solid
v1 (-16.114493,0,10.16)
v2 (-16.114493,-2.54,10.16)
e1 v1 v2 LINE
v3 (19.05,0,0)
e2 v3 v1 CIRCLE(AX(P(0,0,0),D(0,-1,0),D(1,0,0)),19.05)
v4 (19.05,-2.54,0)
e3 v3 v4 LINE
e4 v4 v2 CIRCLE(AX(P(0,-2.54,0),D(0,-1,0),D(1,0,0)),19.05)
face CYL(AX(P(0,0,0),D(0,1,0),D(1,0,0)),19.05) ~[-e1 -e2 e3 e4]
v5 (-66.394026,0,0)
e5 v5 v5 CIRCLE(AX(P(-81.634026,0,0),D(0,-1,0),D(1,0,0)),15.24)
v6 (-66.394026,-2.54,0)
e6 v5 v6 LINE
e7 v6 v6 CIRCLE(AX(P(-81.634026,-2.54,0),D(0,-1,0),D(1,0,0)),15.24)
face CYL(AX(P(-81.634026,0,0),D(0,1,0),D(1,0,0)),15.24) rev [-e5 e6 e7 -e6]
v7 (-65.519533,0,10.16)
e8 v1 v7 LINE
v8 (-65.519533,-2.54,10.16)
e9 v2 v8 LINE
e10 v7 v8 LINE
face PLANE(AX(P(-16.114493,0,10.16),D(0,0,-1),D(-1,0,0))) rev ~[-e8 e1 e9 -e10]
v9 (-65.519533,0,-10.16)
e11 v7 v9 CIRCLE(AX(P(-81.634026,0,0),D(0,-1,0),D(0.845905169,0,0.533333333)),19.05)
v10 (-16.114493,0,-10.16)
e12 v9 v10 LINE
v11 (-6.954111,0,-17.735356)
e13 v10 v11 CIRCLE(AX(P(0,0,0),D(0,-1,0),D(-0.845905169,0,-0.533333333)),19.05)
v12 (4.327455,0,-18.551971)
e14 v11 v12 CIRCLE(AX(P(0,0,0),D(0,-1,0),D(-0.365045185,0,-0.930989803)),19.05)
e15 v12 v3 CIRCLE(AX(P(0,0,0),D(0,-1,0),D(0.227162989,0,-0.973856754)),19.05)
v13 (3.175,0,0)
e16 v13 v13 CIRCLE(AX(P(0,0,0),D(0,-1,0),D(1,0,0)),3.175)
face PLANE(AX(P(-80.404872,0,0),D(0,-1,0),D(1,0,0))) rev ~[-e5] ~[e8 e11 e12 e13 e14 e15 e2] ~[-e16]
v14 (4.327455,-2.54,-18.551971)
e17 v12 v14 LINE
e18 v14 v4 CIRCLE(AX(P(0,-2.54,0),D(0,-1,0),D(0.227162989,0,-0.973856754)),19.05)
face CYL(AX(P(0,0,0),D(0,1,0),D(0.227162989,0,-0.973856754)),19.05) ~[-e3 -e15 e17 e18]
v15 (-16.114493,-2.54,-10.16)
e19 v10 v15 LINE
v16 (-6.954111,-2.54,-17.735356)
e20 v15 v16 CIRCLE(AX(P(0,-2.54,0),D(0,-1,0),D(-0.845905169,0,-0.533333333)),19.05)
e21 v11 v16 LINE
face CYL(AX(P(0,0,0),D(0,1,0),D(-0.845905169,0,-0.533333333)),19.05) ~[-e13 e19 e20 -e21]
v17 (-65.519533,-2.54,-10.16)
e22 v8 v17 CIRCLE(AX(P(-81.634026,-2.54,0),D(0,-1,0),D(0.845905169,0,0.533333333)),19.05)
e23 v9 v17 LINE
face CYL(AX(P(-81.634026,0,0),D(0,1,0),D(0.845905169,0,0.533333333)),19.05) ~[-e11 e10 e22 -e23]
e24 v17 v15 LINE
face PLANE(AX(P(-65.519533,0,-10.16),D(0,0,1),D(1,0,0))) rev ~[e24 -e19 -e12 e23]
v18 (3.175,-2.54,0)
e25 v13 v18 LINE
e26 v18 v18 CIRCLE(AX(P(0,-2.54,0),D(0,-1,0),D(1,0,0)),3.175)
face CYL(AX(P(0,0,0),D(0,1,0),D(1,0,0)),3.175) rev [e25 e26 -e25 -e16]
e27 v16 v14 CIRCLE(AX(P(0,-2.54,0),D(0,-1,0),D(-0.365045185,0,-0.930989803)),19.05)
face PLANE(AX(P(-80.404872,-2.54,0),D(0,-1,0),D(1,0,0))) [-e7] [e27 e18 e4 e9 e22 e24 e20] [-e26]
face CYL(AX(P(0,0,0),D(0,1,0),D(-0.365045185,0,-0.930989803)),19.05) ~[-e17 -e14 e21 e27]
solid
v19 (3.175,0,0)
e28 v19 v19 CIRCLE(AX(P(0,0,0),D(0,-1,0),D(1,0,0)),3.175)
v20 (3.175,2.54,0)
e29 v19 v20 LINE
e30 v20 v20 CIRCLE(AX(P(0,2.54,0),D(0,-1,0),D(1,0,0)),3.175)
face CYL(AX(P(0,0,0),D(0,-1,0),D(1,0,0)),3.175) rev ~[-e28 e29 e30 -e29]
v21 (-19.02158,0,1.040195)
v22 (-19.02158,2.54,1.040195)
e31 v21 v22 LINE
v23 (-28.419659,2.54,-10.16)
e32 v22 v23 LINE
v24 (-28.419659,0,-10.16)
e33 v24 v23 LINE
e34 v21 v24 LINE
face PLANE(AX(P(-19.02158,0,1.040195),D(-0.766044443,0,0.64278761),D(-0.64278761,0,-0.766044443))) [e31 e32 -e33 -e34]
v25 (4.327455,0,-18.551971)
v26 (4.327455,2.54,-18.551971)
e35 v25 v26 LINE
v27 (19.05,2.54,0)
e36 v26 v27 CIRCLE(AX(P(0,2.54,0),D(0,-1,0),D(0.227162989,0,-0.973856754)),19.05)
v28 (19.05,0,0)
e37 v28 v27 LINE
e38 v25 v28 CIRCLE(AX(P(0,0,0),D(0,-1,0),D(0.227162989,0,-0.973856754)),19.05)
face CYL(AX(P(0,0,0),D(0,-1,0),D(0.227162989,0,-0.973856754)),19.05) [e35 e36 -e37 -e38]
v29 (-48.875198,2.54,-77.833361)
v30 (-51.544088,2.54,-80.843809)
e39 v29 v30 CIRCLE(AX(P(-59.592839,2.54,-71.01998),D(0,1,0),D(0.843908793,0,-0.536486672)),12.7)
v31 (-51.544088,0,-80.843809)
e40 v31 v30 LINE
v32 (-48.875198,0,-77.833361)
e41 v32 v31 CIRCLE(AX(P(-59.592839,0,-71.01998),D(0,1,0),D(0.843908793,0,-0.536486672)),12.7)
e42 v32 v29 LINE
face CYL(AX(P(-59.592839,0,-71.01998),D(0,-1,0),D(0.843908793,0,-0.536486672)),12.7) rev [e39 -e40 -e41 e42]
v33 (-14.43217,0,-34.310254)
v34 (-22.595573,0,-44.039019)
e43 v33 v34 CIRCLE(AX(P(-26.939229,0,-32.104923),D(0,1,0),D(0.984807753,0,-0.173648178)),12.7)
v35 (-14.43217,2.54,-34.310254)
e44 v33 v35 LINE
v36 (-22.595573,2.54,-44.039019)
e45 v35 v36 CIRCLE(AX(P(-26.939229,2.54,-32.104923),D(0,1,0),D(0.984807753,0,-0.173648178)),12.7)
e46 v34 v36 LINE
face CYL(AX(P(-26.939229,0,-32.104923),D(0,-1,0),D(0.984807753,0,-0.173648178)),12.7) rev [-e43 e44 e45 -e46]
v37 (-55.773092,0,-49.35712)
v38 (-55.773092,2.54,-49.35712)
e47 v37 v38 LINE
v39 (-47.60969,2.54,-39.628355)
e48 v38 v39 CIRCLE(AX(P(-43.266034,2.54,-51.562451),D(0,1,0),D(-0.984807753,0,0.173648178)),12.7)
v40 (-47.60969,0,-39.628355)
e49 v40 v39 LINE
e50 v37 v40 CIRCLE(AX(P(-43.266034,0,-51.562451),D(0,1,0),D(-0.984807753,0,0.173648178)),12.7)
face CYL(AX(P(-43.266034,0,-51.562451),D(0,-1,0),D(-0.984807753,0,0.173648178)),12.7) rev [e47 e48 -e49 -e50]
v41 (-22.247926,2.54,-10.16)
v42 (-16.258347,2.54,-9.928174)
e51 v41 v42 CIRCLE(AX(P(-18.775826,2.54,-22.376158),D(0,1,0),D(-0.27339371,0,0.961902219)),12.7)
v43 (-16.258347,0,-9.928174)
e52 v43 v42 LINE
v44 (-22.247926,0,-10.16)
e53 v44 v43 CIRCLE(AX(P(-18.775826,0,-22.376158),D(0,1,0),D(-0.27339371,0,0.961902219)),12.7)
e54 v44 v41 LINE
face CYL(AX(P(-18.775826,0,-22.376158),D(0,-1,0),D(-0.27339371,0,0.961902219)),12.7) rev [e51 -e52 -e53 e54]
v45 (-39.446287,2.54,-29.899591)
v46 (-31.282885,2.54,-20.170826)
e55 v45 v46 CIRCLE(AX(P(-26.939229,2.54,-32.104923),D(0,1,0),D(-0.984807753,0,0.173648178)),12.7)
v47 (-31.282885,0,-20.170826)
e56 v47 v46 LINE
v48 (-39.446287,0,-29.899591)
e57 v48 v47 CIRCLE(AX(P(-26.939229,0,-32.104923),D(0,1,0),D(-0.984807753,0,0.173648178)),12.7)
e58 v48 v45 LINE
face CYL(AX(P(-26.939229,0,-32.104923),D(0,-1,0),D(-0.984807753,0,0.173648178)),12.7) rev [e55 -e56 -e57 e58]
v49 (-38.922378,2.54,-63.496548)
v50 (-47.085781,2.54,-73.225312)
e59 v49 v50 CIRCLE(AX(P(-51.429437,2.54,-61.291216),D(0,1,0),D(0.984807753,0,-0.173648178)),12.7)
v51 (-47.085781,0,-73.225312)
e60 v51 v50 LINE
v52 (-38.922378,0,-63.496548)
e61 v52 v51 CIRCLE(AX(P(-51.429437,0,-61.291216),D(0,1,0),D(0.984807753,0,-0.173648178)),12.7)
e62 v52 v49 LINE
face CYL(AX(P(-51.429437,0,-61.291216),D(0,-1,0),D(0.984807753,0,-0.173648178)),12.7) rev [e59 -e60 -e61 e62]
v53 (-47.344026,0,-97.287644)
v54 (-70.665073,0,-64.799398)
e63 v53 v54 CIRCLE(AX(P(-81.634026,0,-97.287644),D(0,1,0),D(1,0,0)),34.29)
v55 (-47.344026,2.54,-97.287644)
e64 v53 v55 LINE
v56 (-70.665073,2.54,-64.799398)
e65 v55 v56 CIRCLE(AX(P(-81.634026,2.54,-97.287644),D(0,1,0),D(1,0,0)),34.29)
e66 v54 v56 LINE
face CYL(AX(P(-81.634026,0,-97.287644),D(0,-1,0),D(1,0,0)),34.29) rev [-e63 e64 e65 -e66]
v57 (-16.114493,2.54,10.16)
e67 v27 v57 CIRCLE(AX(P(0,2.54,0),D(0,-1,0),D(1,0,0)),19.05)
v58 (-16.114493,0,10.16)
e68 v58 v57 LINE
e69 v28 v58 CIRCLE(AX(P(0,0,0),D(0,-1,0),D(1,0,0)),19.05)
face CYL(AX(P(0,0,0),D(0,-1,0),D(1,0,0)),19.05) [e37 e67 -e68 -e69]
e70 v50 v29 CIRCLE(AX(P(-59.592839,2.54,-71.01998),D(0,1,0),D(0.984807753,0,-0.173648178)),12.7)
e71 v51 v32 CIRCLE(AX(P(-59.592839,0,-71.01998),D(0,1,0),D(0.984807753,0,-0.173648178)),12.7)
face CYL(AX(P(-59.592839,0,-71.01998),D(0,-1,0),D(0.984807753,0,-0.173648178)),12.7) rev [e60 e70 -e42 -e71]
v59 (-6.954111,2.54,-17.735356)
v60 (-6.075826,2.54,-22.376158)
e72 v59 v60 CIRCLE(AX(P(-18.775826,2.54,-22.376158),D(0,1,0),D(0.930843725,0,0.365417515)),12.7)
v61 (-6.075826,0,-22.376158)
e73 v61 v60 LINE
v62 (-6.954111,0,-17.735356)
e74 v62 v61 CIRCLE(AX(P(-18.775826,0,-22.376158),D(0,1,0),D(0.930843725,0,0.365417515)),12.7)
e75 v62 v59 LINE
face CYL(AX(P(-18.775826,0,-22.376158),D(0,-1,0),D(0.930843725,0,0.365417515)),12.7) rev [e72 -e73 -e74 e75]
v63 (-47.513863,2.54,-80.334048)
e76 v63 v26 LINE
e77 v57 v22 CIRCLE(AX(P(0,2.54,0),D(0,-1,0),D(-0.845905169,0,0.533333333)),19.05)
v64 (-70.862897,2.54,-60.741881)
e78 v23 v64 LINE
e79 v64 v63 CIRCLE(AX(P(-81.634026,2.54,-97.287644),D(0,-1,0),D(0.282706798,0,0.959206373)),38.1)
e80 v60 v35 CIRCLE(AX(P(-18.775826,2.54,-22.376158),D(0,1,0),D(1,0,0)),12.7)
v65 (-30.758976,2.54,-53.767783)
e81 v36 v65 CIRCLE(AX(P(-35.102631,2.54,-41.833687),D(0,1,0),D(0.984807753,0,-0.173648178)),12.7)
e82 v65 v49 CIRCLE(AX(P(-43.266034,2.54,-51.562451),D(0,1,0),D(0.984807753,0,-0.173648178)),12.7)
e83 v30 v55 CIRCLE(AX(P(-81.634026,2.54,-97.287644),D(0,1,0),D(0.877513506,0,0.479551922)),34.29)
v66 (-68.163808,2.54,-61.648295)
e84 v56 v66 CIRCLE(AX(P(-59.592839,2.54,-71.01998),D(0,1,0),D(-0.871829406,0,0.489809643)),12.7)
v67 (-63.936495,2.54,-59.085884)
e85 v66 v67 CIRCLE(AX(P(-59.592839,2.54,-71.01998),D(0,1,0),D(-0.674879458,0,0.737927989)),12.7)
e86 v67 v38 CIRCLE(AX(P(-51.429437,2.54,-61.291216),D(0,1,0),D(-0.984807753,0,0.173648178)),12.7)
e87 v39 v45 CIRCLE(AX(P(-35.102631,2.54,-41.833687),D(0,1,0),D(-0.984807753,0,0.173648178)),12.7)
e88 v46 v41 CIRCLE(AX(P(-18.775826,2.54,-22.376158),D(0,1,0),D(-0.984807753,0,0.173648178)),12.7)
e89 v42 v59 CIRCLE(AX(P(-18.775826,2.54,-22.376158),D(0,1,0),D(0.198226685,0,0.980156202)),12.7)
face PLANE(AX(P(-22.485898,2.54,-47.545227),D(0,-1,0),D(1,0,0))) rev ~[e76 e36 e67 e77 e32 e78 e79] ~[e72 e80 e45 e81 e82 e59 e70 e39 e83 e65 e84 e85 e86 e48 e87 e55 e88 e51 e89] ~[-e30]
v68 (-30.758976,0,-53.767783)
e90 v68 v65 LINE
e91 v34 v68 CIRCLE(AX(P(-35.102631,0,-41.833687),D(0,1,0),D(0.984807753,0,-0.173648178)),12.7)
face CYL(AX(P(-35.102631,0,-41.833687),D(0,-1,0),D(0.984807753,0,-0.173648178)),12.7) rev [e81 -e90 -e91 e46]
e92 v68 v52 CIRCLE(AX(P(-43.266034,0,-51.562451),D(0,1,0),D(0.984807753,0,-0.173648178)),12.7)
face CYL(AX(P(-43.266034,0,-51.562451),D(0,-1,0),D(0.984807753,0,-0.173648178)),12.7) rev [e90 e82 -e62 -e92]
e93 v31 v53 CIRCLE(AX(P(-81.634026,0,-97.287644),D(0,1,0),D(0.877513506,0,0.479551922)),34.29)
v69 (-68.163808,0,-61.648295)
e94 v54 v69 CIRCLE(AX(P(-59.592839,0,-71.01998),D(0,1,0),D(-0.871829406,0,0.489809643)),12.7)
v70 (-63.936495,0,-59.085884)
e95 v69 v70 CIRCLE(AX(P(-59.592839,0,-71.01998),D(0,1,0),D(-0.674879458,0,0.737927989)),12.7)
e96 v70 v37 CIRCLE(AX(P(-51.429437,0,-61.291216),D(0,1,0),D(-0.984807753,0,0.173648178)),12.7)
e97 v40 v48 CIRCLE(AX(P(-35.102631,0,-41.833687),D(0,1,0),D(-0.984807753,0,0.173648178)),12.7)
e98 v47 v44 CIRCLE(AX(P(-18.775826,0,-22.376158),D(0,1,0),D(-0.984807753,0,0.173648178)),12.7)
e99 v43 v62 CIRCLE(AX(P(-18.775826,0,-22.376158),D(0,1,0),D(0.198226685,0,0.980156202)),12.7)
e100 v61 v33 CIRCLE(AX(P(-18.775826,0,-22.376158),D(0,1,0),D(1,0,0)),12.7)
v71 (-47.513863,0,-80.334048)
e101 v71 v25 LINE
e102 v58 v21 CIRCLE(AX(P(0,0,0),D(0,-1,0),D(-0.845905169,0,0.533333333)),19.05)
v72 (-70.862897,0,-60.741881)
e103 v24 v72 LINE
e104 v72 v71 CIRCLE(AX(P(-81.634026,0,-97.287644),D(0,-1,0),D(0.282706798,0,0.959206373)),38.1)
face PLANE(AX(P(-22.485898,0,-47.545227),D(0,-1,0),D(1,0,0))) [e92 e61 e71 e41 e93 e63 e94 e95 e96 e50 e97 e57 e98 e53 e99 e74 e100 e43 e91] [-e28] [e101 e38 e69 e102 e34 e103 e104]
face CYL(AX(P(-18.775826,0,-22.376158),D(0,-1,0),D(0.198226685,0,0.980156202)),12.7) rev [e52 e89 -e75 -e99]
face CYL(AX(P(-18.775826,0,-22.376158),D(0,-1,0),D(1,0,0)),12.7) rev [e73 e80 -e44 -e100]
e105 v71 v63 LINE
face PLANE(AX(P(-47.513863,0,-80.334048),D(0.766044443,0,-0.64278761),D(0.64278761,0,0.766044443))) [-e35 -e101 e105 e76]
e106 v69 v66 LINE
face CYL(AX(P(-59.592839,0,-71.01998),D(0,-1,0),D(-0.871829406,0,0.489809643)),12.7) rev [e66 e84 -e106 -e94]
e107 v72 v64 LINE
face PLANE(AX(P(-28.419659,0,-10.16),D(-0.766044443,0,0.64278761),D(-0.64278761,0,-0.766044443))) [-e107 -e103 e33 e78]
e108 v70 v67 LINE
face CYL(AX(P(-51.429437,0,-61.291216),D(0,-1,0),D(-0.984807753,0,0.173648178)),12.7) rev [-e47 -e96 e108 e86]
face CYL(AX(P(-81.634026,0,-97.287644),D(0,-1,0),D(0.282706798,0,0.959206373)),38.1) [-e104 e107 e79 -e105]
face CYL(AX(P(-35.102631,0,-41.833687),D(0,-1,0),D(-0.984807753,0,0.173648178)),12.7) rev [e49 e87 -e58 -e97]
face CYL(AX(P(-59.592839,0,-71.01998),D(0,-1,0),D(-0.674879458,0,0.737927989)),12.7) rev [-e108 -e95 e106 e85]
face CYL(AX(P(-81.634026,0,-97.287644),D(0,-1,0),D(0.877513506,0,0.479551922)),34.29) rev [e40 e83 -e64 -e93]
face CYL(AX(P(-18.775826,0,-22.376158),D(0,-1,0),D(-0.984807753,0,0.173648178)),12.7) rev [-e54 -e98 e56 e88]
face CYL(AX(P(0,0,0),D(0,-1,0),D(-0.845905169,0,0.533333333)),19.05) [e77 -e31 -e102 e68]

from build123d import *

# Parameters (mm, degrees)
F0_R     = 15.24
F0_R_2   = 3.175
F1_DEPTH = 2.54
F2_DEPTH = 2.54


with BuildPart() as f1:
    # F0 (on Front) → F1 (new body)
    with BuildSketch(Plane.XZ):
        with BuildLine():
            ThreePointArc((-65.5195329538, -10.16), (-63.3326111745, -5.287787783), (-62.5840264302, 0))
            ThreePointArc((-62.5840264302, 0), (-63.3326111745, 5.287787783), (-65.5195329538, 10.16))
            ThreePointArc((-65.5195329538, 10.16), (-100.6840264302, 0), (-65.5195329538, -10.16))
        make_face()
        with Locations((-81.6340264302, 0)):
            Circle(F0_R, mode=Mode.SUBTRACT)
        with BuildLine():
            ThreePointArc((-65.5195329538, 10.16), (-63.3326111745, 5.287787783), (-62.5840264302, 0))
            ThreePointArc((-62.5840264302, 0), (-63.3326111745, -5.287787783), (-65.5195329538, -10.16))
            Line((-65.5195329538, -10.16), (-28.4196593422, -10.16))
            Line((-28.4196593422, -10.16), (-19.0215796919, 1.0401951868))
            ThreePointArc((-19.0215796919, 1.0401951868), (-18.1501685771, 5.7856616408), (-16.1144934764, 10.16))
            Line((-16.1144934764, 10.16), (-65.5195329538, 10.16))
        make_face()
        with BuildLine():
            ThreePointArc((19.05, 0), (5.287787783, 18.3014152557), (-16.1144934764, 10.16))
            ThreePointArc((-16.1144934764, 10.16), (-18.1501685771, 5.7856616408), (-19.0215796919, 1.0401951868))
            ThreePointArc((-19.0215796919, 1.0401951868), (-18.4728068477, -4.6538056648), (-16.2583471742, -9.9281744125))
            ThreePointArc((-16.2583471742, -9.9281744125), (-10.6124234359, -12.6473937559), (-6.954110776, -17.7353557426))
            ThreePointArc((-6.954110776, -17.7353557426), (-1.3753346542, -19.0002882765), (4.3274549344, -18.5519711565))
            ThreePointArc((4.3274549344, -18.5519711565), (14.9221398683, -11.8419695047), (19.05, 0))
        make_face()
        Circle(F0_R_2, mode=Mode.SUBTRACT)
        with BuildLine():
            ThreePointArc((-16.2583471742, -9.9281744125), (-19.2670095389, -9.6856602103), (-22.2479261978, -10.16))
            Line((-22.2479261978, -10.16), (-16.1144934764, -10.16))
            ThreePointArc((-16.1144934764, -10.16), (-16.1868353523, -10.0443447411), (-16.2583471742, -9.9281744125))
        make_face()
        with BuildLine():
            Line((-19.0215796919, 1.0401951868), (-28.4196593422, -10.16))
            Line((-28.4196593422, -10.16), (-22.2479261978, -10.16))
            ThreePointArc((-22.2479261978, -10.16), (-19.2670095389, -9.6856602103), (-16.2583471742, -9.9281744125))
            ThreePointArc((-16.2583471742, -9.9281744125), (-18.4728068477, -4.6538056648), (-19.0215796919, 1.0401951868))
        make_face()
        with BuildLine():
            ThreePointArc((-6.954110776, -17.7353557426), (-10.6124234359, -12.6473937559), (-16.2583471742, -9.9281744125))
            ThreePointArc((-16.2583471742, -9.9281744125), (-16.1868353523, -10.0443447411), (-16.1144934764, -10.16))
            ThreePointArc((-16.1144934764, -10.16), (-12.1402895021, -14.6804588077), (-6.954110776, -17.7353557426))
        make_face()
    extrude(amount=F1_DEPTH)


with BuildPart() as f2:
    # F0 (on Front) → F2 (new body)
    with BuildSketch(Plane.XZ):
        with BuildLine():
            Line((-47.513862793, -80.334047803), (4.3274549344, -18.5519711565))
            ThreePointArc((4.3274549344, -18.5519711565), (-1.3753346542, -19.0002882765), (-6.954110776, -17.7353557426))
            ThreePointArc((-6.954110776, -17.7353557426), (-6.2973288868, -20.014568078), (-6.0758260789, -22.3761581835))
            ThreePointArc((-6.0758260789, -22.3761581835), (-8.3725951165, -29.6605789252), (-14.4321702587, -34.3102544675))
            ThreePointArc((-14.4321702587, -34.3102544675), (-17.2104642944, -40.2683252541), (-22.5955729017, -44.0390188951))
            ThreePointArc((-22.5955729017, -44.0390188951), (-25.3738669374, -49.9970896817), (-30.7589755447, -53.7677833227))
            ThreePointArc((-30.7589755447, -53.7677833227), (-33.5372695804, -59.7258541094), (-38.9223781878, -63.4965477503))
            ThreePointArc((-38.9223781878, -63.4965477503), (-41.7006722234, -69.454618537), (-47.0857808308, -73.2253121779))
            ThreePointArc((-47.0857808308, -73.2253121779), (-47.7541230349, -75.6172400855), (-48.8751976268, -77.8333610605))
            ThreePointArc((-48.8751976268, -77.8333610605), (-48.1711624462, -79.0709833859), (-47.513862793, -80.334047803))
        make_face()
        with BuildLine():
            ThreePointArc((-68.1638084144, -61.6482948628), (-69.5048829018, -61.1698664199), (-70.8628974193, -60.7418814597))
            ThreePointArc((-70.8628974193, -60.7418814597), (-112.1462372262, -120.1046333926), (-43.5340264302, -97.2876442761))
            ThreePointArc((-43.5340264302, -97.2876442761), (-44.542327665, -88.580412643), (-47.513862793, -80.334047803))
            ThreePointArc((-47.513862793, -80.334047803), (-48.1711624462, -79.0709833859), (-48.8751976268, -77.8333610605))
            ThreePointArc((-48.8751976268, -77.8333610605), (-50.0896781123, -79.44493893), (-51.5440882931, -80.8438088687))
            ThreePointArc((-51.5440882931, -80.8438088687), (-48.4106304665, -88.8017700937), (-47.3440264302, -97.2876442761))
            ThreePointArc((-47.3440264302, -97.2876442761), (-109.4901704698, -117.2836273539), (-70.6650727554, -64.7993978587))
            ThreePointArc((-70.6650727554, -64.7993978587), (-69.5400104718, -63.124172221), (-68.1638084144, -61.6482948628))
        make_face()
        with BuildLine():
            Line((-22.2479261978, -10.16), (-28.4196593422, -10.16))
            Line((-28.4196593422, -10.16), (-70.8628974193, -60.7418814597))
            ThreePointArc((-70.8628974193, -60.7418814597), (-69.5048829018, -61.1698664199), (-68.1638084144, -61.6482948628))
            ThreePointArc((-68.1638084144, -61.6482948628), (-66.1760278564, -60.1594265442), (-63.9364951143, -59.0858840376))
            ThreePointArc((-63.9364951143, -59.0858840376), (-61.1582010786, -53.1278132509), (-55.7730924713, -49.35711961))
            ThreePointArc((-55.7730924713, -49.35711961), (-52.9947984356, -43.3990488233), (-47.6096898282, -39.6283551824))
            ThreePointArc((-47.6096898282, -39.6283551824), (-44.8313957926, -33.6702843957), (-39.4462871852, -29.8995907547))
            ThreePointArc((-39.4462871852, -29.8995907547), (-36.6679931496, -23.9415199681), (-31.2828845422, -20.1708263271))
            ThreePointArc((-31.2828845422, -20.1708263271), (-28.2038448627, -13.8671945678), (-22.2479261978, -10.16))
        make_face()
        with BuildLine():
            Line((-19.0215796919, 1.0401951868), (-28.4196593422, -10.16))
            Line((-28.4196593422, -10.16), (-22.2479261978, -10.16))
            ThreePointArc((-22.2479261978, -10.16), (-19.2670095389, -9.6856602103), (-16.2583471742, -9.9281744125))
            ThreePointArc((-16.2583471742, -9.9281744125), (-18.4728068477, -4.6538056648), (-19.0215796919, 1.0401951868))
        make_face()
        with BuildLine():
            ThreePointArc((19.05, 0), (5.287787783, 18.3014152557), (-16.1144934764, 10.16))
            ThreePointArc((-16.1144934764, 10.16), (-18.1501685771, 5.7856616408), (-19.0215796919, 1.0401951868))
            ThreePointArc((-19.0215796919, 1.0401951868), (-18.4728068477, -4.6538056648), (-16.2583471742, -9.9281744125))
            ThreePointArc((-16.2583471742, -9.9281744125), (-10.6124234359, -12.6473937559), (-6.954110776, -17.7353557426))
            ThreePointArc((-6.954110776, -17.7353557426), (-1.3753346542, -19.0002882765), (4.3274549344, -18.5519711565))
            ThreePointArc((4.3274549344, -18.5519711565), (14.9221398683, -11.8419695047), (19.05, 0))
        make_face()
        Circle(F0_R_2, mode=Mode.SUBTRACT)
    extrude(amount=-F2_DEPTH)


solid = Compound([f1.part, f2.part])
